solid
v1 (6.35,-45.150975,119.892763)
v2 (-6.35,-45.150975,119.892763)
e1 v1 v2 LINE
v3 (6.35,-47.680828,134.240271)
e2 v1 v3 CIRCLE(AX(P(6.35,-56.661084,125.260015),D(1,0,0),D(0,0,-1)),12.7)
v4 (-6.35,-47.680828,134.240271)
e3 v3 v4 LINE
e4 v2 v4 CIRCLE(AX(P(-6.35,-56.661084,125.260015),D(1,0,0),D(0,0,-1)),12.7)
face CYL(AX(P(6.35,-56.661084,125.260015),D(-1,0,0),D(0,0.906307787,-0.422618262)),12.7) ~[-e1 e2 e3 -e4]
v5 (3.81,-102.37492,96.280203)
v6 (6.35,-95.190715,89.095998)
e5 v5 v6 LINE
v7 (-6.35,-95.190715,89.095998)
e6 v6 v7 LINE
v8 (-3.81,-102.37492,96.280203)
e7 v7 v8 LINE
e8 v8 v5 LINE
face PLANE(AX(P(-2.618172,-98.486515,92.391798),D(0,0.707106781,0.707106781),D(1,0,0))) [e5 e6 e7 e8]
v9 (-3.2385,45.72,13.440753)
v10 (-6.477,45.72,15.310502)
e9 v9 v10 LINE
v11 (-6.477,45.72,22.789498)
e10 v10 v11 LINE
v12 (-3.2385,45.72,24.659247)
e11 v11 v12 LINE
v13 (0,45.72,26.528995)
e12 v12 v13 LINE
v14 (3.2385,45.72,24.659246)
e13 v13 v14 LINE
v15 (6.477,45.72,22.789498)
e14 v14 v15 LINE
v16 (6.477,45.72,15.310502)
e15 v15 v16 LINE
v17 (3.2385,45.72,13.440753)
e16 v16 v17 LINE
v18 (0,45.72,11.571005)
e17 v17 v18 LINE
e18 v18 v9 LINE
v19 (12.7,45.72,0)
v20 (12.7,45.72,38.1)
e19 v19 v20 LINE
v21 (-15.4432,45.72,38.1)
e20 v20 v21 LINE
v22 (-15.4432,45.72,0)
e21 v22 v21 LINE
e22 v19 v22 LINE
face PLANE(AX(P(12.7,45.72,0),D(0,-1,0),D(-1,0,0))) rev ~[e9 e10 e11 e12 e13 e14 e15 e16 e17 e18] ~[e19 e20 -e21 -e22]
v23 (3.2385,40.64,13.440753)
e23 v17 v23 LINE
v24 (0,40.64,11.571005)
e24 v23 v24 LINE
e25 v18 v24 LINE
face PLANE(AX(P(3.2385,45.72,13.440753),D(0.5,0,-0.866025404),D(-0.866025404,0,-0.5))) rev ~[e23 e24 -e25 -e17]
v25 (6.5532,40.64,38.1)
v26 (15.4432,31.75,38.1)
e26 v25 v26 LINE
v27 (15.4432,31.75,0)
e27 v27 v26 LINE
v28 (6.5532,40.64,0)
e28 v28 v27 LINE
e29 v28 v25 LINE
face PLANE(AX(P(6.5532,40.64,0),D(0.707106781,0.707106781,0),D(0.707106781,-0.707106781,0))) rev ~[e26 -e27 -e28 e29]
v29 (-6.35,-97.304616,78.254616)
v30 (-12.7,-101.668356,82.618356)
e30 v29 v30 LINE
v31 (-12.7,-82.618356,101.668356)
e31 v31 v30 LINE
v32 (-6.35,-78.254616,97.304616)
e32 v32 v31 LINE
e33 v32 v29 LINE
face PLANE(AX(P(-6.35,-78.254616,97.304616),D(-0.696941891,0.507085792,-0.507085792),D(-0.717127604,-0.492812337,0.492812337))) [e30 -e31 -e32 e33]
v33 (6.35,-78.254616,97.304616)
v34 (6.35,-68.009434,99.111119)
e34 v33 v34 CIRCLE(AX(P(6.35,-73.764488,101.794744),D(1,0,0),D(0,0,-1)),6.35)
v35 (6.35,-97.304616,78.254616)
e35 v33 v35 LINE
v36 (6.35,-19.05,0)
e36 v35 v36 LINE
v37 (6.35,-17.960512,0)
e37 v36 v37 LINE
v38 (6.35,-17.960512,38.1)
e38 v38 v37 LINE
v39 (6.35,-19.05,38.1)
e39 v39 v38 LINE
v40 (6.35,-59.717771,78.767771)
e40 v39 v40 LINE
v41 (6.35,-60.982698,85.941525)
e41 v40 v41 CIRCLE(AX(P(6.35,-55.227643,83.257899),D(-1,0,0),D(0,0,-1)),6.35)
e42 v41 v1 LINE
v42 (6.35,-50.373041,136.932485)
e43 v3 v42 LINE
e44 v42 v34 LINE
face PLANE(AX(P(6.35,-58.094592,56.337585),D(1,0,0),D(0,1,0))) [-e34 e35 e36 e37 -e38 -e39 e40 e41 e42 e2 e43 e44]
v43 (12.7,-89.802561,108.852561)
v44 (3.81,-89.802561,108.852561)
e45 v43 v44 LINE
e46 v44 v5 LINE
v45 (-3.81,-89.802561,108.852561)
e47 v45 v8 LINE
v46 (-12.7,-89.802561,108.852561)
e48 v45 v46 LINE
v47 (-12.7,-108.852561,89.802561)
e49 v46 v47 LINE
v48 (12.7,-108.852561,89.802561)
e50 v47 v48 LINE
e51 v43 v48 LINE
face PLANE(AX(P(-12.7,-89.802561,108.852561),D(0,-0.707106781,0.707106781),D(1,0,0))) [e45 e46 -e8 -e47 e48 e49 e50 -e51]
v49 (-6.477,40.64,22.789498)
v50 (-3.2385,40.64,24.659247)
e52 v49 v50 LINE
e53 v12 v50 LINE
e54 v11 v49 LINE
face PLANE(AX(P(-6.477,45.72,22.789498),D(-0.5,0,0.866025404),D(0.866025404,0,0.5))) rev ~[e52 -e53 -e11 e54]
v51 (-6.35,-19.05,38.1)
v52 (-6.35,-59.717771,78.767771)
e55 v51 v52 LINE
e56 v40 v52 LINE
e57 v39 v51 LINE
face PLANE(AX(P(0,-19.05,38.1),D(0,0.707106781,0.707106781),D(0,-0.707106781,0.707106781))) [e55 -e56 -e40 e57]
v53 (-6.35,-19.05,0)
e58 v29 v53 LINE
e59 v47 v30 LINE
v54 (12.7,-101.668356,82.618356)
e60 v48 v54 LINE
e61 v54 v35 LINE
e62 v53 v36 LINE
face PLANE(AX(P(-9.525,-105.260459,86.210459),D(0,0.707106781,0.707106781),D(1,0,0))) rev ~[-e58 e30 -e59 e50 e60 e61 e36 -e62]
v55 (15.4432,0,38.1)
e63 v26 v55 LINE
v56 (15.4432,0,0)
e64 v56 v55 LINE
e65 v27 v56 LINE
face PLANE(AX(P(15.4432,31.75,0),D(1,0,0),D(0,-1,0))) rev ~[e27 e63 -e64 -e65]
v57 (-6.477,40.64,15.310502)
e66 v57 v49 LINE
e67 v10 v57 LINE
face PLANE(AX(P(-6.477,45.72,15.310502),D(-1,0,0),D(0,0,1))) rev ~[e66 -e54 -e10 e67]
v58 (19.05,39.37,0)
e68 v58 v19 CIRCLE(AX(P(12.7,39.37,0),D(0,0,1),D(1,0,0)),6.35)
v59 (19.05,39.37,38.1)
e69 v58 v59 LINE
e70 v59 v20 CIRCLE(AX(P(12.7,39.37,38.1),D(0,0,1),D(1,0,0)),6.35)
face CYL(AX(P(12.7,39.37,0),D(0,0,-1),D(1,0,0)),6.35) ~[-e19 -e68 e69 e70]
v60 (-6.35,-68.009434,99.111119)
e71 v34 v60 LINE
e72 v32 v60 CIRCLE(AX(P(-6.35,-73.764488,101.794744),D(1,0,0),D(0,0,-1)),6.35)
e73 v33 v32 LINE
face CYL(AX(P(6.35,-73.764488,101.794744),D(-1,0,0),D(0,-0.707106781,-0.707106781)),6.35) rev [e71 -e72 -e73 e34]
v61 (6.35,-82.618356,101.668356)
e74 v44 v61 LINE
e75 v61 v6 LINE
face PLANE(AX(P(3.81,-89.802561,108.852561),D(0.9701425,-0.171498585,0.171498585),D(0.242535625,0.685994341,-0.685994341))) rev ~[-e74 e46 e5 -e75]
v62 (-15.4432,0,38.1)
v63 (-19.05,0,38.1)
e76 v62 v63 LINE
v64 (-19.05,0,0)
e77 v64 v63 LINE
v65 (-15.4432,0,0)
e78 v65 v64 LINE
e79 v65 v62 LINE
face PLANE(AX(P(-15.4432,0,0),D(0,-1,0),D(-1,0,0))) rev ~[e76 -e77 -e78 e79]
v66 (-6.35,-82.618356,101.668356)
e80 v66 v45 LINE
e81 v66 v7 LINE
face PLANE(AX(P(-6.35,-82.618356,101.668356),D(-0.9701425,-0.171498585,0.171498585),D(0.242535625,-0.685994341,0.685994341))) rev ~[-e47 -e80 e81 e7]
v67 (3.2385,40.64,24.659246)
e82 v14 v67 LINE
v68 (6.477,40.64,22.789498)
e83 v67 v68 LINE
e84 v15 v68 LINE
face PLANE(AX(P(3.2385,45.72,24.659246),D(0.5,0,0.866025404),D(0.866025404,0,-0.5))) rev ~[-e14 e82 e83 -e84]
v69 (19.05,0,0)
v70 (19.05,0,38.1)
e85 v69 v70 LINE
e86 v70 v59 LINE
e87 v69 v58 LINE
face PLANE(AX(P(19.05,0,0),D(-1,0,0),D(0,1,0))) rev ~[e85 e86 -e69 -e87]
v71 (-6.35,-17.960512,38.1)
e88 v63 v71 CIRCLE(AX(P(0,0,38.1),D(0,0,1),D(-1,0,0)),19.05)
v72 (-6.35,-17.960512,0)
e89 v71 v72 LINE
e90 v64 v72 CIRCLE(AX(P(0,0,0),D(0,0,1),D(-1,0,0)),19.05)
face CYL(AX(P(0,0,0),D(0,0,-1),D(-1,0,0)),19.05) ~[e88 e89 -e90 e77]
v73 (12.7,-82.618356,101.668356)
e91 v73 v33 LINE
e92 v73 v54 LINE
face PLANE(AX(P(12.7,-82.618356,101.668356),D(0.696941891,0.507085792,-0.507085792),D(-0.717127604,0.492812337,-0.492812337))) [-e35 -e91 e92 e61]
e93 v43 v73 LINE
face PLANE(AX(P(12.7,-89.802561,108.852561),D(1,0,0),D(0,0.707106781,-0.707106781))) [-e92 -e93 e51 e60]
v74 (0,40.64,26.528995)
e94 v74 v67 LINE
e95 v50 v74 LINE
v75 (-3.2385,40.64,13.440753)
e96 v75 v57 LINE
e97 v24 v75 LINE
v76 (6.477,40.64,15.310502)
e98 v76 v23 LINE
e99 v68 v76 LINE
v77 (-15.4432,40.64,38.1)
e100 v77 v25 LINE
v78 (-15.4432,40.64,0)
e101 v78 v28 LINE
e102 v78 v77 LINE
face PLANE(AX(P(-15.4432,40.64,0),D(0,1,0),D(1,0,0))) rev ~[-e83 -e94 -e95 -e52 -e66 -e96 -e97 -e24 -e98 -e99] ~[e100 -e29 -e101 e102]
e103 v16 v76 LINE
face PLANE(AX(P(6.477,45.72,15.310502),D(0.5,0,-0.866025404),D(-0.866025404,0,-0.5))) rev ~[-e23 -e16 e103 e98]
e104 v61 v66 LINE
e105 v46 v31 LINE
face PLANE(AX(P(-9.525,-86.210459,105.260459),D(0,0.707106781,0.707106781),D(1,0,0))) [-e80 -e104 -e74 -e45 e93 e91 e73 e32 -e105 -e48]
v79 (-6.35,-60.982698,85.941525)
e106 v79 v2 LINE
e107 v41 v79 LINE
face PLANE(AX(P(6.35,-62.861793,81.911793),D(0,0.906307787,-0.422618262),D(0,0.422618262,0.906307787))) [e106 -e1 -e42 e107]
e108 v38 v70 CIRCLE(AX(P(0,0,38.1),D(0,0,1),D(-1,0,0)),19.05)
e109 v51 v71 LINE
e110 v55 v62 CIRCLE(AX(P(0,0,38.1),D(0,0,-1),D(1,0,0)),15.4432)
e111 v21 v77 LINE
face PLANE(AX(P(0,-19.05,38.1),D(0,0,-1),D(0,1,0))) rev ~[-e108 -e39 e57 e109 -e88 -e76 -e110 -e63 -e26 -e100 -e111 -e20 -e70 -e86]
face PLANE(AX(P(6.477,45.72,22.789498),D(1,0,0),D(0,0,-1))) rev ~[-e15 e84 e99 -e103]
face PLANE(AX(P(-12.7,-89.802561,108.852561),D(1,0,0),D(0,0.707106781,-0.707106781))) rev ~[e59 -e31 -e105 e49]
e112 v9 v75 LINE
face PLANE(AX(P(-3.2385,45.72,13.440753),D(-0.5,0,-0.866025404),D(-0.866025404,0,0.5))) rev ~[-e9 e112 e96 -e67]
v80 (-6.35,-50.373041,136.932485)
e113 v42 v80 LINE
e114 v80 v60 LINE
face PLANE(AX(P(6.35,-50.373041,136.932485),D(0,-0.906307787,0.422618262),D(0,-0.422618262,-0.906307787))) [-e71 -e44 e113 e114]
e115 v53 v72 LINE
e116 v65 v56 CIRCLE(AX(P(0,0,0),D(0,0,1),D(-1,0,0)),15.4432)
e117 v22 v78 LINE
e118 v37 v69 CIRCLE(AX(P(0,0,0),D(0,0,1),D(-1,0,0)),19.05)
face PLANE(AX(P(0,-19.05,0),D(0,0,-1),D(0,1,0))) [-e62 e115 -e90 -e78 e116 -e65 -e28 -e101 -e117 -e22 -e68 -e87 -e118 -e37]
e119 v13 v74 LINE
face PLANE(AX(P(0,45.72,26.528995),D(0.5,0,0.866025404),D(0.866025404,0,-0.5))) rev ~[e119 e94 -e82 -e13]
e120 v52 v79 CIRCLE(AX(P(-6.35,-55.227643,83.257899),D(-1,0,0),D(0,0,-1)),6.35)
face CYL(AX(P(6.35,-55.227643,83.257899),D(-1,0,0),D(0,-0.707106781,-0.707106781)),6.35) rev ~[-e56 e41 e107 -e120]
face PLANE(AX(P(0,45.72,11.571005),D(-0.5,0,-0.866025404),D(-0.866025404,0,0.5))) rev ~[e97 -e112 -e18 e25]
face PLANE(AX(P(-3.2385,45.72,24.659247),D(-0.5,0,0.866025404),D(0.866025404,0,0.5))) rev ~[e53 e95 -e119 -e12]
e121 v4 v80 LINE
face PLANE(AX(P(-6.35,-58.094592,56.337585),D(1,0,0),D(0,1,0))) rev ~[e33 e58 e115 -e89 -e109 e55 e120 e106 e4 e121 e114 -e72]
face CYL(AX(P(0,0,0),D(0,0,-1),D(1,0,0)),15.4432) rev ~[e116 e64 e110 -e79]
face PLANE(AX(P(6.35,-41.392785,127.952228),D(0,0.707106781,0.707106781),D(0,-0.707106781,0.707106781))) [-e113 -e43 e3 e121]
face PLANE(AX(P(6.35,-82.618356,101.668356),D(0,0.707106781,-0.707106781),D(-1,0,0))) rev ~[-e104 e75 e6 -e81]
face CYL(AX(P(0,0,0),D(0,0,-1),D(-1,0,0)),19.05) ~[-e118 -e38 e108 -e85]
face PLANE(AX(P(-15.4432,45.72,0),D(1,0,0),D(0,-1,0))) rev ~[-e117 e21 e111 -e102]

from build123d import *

# Parameters (mm, degrees)
F1_DEPTH  = 38.1
F2_W      = 3.6068
F2_H      = 38.1
F3_DEPTH  = 6.35
F5_DEPTH  = 12.7
F6_R      = 6.35
F7_R      = 12.7
F8_W      = 6.35
F8_H      = 10.16
F9_DEPTH  = 26.9407683632
F11_DEPTH = 17.78
F13_DEPTH = 25.4


# Not quite as in the source:
# - a feature names something its author has since deleted; it is built from what else it names


with BuildPart() as f1:
    # F0 (on Top) → F1 (new body)
    with BuildSketch(Plane.XY):
        with BuildLine():
            ThreePointArc((15.4432, 0), (0, -15.4432), (-15.4432, 0))
            Line((-15.4432, 0), (-19.05, 0))
            ThreePointArc((-19.05, 0), (0, -19.05), (19.05, 0))
            Line((19.05, 0), (19.05, 39.37))
            ThreePointArc((19.05, 39.37), (17.1901280605, 43.8601280605), (12.7, 45.72))
            Line((12.7, 45.72), (-15.4432, 45.72))
            Line((-15.4432, 45.72), (-15.4432, 40.64))
            Line((-15.4432, 40.64), (6.5532, 40.64))
            Line((6.5532, 40.64), (9.0932, 40.64))
            Line((9.0932, 40.64), (15.4432, 40.64))
            Line((15.4432, 40.64), (15.4432, 34.29))
            Line((15.4432, 34.29), (15.4432, 31.75))
            Line((15.4432, 31.75), (15.4432, 0))
        make_face()
        with BuildLine():
            Line((6.5532, 40.64), (15.4432, 31.75))
            Line((15.4432, 31.75), (15.4432, 34.29))
            ThreePointArc((15.4432, 34.29), (13.5833280605, 38.7801280605), (9.0932, 40.64))
            Line((9.0932, 40.64), (6.5532, 40.64))
        make_face()
        with BuildLine():
            ThreePointArc((9.0932, 40.64), (13.5833280605, 38.7801280605), (15.4432, 34.29))
            Line((15.4432, 34.29), (15.4432, 40.64))
            Line((15.4432, 40.64), (9.0932, 40.64))
        make_face()
    extrude(amount=F1_DEPTH)

    # F2 (on Right) → F3 (join, symmetric)
    with BuildSketch(Plane.YZ):
        Polygon((-108.8525612107, 89.8025612107), (-19.05, 0), (-19.05, 38.1), (-89.8025612107, 108.8525612107), align=None)
        with Locations((-17.2466, 19.05)):
            Rectangle(F2_W, F2_H)
    extrude(amount=F3_DEPTH, both=True)

    # F4 (on face) → F5 (join, through all)
    with BuildSketch(Plane.YZ.offset(6.35)):
        Polygon((-50.3730412721, 136.93248455), (-71.8420489686, 90.8920489686), (-62.8617928475, 81.9117928475), (-41.3927851511, 127.9522284289), align=None)
    extrude(amount=-F5_DEPTH)

    # F6
    f6_edges = [f1.edges().sort_by_distance(p)[0] for p in [
        (0, -71.842049, 90.892049),
        (0, -62.861793, 81.911793),
    ]]
    fillet(f6_edges, radius=F6_R)

    # F7
    f7_edges = [f1.edges().sort_by_distance(p)[0] for p in [
        (0, -41.392785, 127.952228),
    ]]
    fillet(f7_edges, radius=F7_R)

    # F8 (on face) → F9 (join, through all)
    with BuildSketch(Plane(origin=(0, 9.525, 9.525), x_dir=(1, 0, 0), z_dir=(0, 0.7071067812, 0.7071067812))):
        with Locations((-9.525, -135.3903841816)):
            Rectangle(F8_W, F8_H)
        with Locations((9.525, -135.3903841816)):
            Rectangle(F8_W, F8_H)
        Polygon((-12.7, -130.3103841816), (-6.35, -130.3103841816), (-6.35, -124.1391240244), align=None)
        Polygon((6.35, -124.1391240244), (6.35, -130.3103841816), (12.7, -130.3103841816), align=None)
    extrude(amount=-F9_DEPTH)

    # F10 (on face) → F11 (cut)
    with BuildSketch(Plane(origin=(0, 9.525, 9.525), x_dir=(1, 0, 0), z_dir=(0, 0.7071067812, 0.7071067812))):
        Polygon((-6.35, -130.3103841816), (-3.81, -140.4703841816), (0, -140.4703841816), (0, -130.3103841816), align=None)
        Polygon((0, -130.3103841816), (0, -140.4703841816), (3.81, -140.4703841816), (6.35, -130.3103841816), align=None)
    extrude(amount=-F11_DEPTH, mode=Mode.SUBTRACT)

    # F12 (on face) → F13 (cut)
    with BuildSketch(Plane(origin=(0, 45.72, 0), x_dir=(-1, 0, 0), z_dir=(0, 1, 0))):
        with BuildLine():
            Line((-6.477, 15.3105023065), (-3.2384999613, 13.4407534373))
            ThreePointArc((-3.2384999613, 13.4407534373), (-5.6092465291, 15.8114999806), (-6.477, 19.05))
            Line((-6.477, 19.05), (-6.477, 15.3105023065))
        make_face()
        with BuildLine():
            Line((-3.2384999613, 13.4407534373), (0, 11.5710046129))
            Line((0, 11.5710046129), (0, 12.573))
            ThreePointArc((0, 12.573), (-1.6763709335, 12.7936984173), (-3.2384999613, 13.4407534373))
        make_face()
        with BuildLine():
            Line((0, 12.573), (0, 11.5710046129))
            Line((0, 11.5710046129), (3.2384995854, 13.4407532203))
            ThreePointArc((3.2384995854, 13.4407532203), (1.6763707239, 12.7936983612), (0, 12.573))
        make_face()
        with BuildLine():
            ThreePointArc((6.477, 19.05), (5.6092464206, 15.8114997927), (3.2384995854, 13.4407532203))
            Line((3.2384995854, 13.4407532203), (6.477, 15.3105023065))
            Line((6.477, 15.3105023065), (6.477, 19.05))
        make_face()
        with BuildLine():
            ThreePointArc((3.2384999681, 24.6592465587), (5.6092465311, 22.288500016), (6.477, 19.05))
            Line((6.477, 19.05), (6.477, 22.7894976935))
            Line((6.477, 22.7894976935), (3.2384999681, 24.6592465587))
        make_face()
        with BuildLine():
            Line((-6.477, 22.7894976935), (-6.477, 19.05))
            ThreePointArc((-6.477, 19.05), (-5.6092466761, 22.2884997648), (-3.2385004704, 24.6592462687))
            Line((-3.2385004704, 24.6592462687), (-6.477, 22.7894976935))
        make_face()
        with BuildLine():
            ThreePointArc((-3.2385004704, 24.6592462687), (-1.6763712174, 25.3063015066), (0, 25.527))
            Line((0, 25.527), (0, 26.5289953871))
            Line((0, 26.5289953871), (-3.2385004704, 24.6592462687))
        make_face()
        with BuildLine():
            ThreePointArc((0, 25.527), (1.6763709373, 25.3063015816), (3.2384999681, 24.6592465587))
            Line((3.2384999681, 24.6592465587), (0, 26.5289953871))
            Line((0, 26.5289953871), (0, 25.527))
        make_face()
        with BuildLine():
            Line((0, 19.05), (6.477, 19.05))
            ThreePointArc((6.477, 19.05), (5.6092465311, 22.288500016), (3.2384999681, 24.6592465587))
            ThreePointArc((3.2384999681, 24.6592465587), (1.6763709373, 25.3063015816), (0, 25.527))
            Line((0, 25.527), (0, 19.05))
        make_face()
        with BuildLine():
            Line((-6.477, 19.05), (0, 19.05))
            Line((0, 19.05), (0, 25.527))
            ThreePointArc((0, 25.527), (-1.6763712174, 25.3063015066), (-3.2385004704, 24.6592462687))
            ThreePointArc((-3.2385004704, 24.6592462687), (-5.6092466761, 22.2884997648), (-6.477, 19.05))
        make_face()
        with BuildLine():
            ThreePointArc((-3.2384999613, 13.4407534373), (-1.6763709335, 12.7936984173), (0, 12.573))
            Line((0, 12.573), (0, 19.05))
            Line((0, 19.05), (-6.477, 19.05))
            ThreePointArc((-6.477, 19.05), (-5.6092465291, 15.8114999806), (-3.2384999613, 13.4407534373))
        make_face()
        with BuildLine():
            Line((0, 19.05), (0, 12.573))
            ThreePointArc((0, 12.573), (1.6763707239, 12.7936983612), (3.2384995854, 13.4407532203))
            ThreePointArc((3.2384995854, 13.4407532203), (5.6092464206, 15.8114997927), (6.477, 19.05))
            Line((6.477, 19.05), (0, 19.05))
        make_face()
    extrude(amount=-F13_DEPTH, mode=Mode.SUBTRACT)


solid = f1.part
